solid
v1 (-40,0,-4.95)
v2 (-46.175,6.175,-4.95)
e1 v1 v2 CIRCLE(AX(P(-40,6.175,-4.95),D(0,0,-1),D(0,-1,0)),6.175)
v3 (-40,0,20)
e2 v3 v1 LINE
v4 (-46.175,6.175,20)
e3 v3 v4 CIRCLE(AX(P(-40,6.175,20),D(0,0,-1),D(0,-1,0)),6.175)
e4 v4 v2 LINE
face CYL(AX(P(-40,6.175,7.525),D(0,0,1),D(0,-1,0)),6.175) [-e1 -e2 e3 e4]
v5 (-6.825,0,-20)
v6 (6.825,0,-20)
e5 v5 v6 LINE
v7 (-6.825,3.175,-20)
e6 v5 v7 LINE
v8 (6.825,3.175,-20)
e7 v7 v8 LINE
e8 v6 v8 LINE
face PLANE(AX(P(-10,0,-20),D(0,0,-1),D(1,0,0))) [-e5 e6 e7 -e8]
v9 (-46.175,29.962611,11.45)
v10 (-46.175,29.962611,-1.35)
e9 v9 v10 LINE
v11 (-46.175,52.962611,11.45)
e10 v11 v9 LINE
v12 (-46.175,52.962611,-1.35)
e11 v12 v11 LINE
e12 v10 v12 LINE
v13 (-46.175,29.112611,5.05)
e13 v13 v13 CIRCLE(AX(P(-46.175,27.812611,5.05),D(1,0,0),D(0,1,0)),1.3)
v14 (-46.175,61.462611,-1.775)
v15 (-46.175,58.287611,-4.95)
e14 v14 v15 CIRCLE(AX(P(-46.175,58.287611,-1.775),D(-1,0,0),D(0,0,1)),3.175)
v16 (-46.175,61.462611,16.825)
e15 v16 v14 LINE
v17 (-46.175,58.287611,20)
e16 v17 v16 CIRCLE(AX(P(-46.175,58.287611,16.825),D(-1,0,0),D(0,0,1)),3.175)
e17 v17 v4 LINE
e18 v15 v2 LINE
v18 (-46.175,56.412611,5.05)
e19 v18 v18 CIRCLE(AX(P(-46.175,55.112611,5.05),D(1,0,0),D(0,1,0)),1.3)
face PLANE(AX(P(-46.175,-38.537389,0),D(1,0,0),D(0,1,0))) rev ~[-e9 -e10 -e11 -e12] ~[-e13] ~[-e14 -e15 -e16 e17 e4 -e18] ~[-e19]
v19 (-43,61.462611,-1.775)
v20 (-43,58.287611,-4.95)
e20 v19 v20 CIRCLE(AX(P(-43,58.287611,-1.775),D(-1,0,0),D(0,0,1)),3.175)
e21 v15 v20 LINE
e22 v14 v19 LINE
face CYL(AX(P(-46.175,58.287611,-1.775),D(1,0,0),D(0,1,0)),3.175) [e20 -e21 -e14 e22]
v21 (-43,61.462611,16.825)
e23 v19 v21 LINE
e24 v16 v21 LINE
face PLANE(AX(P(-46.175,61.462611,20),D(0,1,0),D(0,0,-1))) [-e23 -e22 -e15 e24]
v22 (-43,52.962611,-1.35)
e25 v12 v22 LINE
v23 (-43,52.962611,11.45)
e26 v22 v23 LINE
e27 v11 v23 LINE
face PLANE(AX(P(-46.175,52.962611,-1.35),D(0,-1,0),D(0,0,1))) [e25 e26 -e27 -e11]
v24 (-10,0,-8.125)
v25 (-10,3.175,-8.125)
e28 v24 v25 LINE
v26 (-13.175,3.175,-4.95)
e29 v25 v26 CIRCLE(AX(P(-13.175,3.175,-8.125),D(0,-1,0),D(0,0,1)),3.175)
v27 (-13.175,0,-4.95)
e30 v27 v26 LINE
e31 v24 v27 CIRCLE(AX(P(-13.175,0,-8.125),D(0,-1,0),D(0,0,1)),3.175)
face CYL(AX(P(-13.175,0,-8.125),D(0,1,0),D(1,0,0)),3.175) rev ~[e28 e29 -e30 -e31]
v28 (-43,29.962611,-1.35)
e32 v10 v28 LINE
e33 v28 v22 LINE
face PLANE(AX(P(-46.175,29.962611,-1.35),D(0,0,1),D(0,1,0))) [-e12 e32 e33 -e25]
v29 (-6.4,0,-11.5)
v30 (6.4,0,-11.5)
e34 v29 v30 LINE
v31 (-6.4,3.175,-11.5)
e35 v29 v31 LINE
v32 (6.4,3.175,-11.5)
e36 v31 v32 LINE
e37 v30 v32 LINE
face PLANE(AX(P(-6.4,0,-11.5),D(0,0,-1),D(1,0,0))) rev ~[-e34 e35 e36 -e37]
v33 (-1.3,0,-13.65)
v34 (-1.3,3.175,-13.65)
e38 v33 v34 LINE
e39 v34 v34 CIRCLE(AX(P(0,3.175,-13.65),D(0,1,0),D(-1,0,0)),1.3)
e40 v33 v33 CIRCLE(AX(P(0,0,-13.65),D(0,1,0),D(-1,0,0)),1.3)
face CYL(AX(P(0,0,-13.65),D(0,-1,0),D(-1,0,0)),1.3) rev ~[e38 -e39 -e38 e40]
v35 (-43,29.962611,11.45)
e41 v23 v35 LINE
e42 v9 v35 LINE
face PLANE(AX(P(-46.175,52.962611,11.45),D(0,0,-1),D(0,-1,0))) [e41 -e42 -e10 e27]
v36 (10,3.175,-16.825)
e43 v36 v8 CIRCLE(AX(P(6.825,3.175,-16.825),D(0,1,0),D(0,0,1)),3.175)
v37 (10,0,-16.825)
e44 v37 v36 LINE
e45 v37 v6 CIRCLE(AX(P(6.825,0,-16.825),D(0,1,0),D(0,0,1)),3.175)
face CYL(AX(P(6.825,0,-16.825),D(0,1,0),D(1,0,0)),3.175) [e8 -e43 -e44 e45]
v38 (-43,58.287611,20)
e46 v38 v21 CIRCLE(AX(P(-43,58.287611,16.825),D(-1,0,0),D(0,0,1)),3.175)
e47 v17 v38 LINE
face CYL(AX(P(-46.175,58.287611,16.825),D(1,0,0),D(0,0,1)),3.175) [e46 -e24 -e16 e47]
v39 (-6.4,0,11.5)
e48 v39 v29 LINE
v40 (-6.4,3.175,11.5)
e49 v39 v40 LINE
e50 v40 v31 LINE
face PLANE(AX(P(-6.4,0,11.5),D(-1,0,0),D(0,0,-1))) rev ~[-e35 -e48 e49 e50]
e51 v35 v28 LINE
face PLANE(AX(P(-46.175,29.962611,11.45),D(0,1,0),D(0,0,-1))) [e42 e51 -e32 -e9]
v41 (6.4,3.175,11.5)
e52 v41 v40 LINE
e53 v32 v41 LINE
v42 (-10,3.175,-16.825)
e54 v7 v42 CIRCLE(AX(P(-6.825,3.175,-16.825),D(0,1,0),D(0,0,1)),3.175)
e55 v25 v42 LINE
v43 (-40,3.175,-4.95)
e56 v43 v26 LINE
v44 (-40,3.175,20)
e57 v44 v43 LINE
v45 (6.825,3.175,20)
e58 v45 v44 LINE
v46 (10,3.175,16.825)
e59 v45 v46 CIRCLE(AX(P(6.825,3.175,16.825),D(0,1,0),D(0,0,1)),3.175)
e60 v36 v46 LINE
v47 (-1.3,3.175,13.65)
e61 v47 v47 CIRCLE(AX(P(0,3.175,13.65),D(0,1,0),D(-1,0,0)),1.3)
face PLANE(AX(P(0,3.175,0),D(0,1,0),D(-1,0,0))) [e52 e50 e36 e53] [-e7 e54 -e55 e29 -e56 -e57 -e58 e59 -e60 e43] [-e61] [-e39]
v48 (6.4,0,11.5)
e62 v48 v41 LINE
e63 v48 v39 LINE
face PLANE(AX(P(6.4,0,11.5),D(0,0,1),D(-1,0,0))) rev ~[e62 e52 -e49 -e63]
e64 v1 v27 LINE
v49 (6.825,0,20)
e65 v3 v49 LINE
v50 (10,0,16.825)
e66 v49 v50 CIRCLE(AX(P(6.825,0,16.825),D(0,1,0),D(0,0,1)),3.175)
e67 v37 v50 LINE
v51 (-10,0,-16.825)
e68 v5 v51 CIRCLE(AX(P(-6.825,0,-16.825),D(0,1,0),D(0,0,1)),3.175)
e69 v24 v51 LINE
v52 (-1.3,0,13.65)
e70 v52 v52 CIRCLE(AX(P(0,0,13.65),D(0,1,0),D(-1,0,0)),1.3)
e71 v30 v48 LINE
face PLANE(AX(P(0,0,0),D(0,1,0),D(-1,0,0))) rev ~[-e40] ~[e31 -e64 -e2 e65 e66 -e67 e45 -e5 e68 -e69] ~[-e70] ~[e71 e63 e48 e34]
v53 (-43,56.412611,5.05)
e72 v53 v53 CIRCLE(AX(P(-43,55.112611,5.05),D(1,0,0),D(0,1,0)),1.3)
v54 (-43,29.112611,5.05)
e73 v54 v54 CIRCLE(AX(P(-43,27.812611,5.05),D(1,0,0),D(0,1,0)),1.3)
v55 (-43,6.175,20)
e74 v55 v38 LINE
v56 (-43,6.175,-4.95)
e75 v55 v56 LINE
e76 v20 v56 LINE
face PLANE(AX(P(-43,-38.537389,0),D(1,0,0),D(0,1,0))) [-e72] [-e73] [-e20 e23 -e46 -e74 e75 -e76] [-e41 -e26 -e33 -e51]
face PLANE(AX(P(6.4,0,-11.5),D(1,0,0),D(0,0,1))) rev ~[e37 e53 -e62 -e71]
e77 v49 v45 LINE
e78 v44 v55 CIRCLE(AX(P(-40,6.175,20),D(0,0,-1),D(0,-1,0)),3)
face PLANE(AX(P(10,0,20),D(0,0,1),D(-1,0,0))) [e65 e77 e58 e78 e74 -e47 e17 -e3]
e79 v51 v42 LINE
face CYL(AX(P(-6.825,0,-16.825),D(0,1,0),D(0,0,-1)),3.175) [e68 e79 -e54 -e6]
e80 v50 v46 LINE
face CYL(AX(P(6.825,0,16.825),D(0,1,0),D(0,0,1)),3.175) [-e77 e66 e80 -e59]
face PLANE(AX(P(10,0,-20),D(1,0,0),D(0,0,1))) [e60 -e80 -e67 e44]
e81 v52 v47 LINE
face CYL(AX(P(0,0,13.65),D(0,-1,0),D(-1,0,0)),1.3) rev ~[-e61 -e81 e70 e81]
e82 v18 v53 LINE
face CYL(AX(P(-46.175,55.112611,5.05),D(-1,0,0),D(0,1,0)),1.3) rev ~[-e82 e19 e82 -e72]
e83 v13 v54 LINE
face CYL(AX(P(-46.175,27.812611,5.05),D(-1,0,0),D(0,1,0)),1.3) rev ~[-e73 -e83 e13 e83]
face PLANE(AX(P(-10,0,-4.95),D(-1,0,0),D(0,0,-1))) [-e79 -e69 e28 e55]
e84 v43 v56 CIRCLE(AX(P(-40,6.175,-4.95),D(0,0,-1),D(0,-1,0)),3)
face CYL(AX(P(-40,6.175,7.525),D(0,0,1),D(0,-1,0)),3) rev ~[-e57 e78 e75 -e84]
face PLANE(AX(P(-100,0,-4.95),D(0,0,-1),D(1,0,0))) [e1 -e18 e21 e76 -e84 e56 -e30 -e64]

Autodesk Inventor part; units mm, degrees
ref_plane "YZ Plane" through (0, 0, 0) normal (1, 0, 0) x (0, 1, 0)
ref_plane "XZ Plane" through (0, 0, 0) normal (0, 1, 0) x (-1, 0, 0)
ref_plane "XY Plane" through (0, 0, 0) normal (0, 0, 1) x (1, 0, 0)
sketch "Sketch2" plane through (0, 0, 0) normal (0, 1, 0) x (-1, 0, 0)
  line L0 (-6.4, 11.5) -> (6.4, 11.5)
  line L1 (6.4, 11.5) -> (6.4, -11.5)
  line L2 (6.4, -11.5) -> (-6.4, -11.5)
  line L3 (-6.4, -11.5) -> (-6.4, 11.5)
  line L4 (-6.4, 11.5) -> (6.4, -11.5) construction
  line L5 (6.4, 11.5) -> (-6.4, -11.5) construction
  circle A0 centre (0, 0) radius 13.65 construction
  line L6 (0, 0) -> (0, -13.65) construction
  circle A1 centre (0, -13.65) radius 1.3
  circle A2 centre (0, 13.65) radius 1.3
  line L7 (-10, 20) -> (10, 20)
  line L8 (10, 20) -> (10, -20)
  line L9 (10, -20) -> (-10, -20)
  line L10 (-10, -20) -> (-10, 20)
  line L11 (-10, 20) -> (10, -20) construction
  line L12 (10, 20) -> (-10, -20) construction
  line L13 (-10, 5.05) -> (10, 5.05) construction
  line L14 (10, 15.05) -> (100, 15.05)
  line L15 (100, 15.05) -> (100, -4.95)
  line L16 (100, -4.95) -> (10, -4.95)
  line L17 (10, -4.95) -> (10, 15.05)
  line L18 (100, 5.05) -> (10, 5.05) construction
  line L19 (91.5, 11.45) -> (68.5, 11.45)
  line L20 (68.5, 11.45) -> (68.5, -1.35)
  line L21 (68.5, -1.35) -> (91.5, -1.35)
  line L22 (91.5, -1.35) -> (91.5, 11.45)
  line L23 (91.5, 11.45) -> (68.5, -1.35) construction
  line L24 (68.5, 11.45) -> (91.5, -1.35) construction
  circle A3 centre (80, 5.05) radius 13.65 construction
  circle A4 centre (93.65, 5.05) radius 1.3
  circle A5 centre (66.35, 5.05) radius 1.3
  line L25 (100, 15.05) -> (10, 15.05)
  line L26 (10, 15.05) -> (10, 20)
  line L27 (10, 20) -> (100, 20)
  line L28 (100, 20) -> (100, 15.05)
  dimension "d2" = 27.3
  dimension "d20" = 27.3
  dimension "d0" = 12.8
  dimension "d1" = 23
  dimension "d3" = 2.6
  dimension "d6" = 360
  dimension "d8" = 20
  dimension "d9" = 40
  dimension "d11" = 8.6
  dimension "d12" = 90
  dimension "d14" = 20
  dimension "d18" = 12.8
  dimension "d19" = 23
  dimension "d21" = 2.6
  dimension "d24" = 360
  dimension "d26" = 20
extrude "Extrusion1" add sketch "Sketch2" along normal blind 3.175
fillet "Fillet1" radius 3.175 6 edges at (10, 1.5875, 20) (10, 1.5875, -20) (-10, 1.5875, -20) (-10, 1.5875, -4.95) (-100, 1.5875, -4.95) (-100, 1.5875, 20)
sketch "Sketch3" plane through (0, 3.175, 0) normal (0, 1, 0) x (1, 0, 0)
  line L0 (-96.825, -15.05) -> (-13.175, -15.05) projected
  line L1 (-40, -15.05) -> (-40, 4.95)
  line L2 (-13.175, 4.95) -> (-96.825, 4.95) projected
  line L3 (10, -16.825) -> (10, 16.825) projected
  point P0 (0, 0)
  dimension "d27" = 50
bend part "Bend Part1" radius 3 angle 90 line through (-40, 3.175, 15.05) along (0, 0, -1) centre toward (0, 1, 0) moving side (-1, 0, 0) both sides no
equation "\"d20\" = d2"
equation "\"d18\" = d0"
equation "\"d19\" = d1"
equation "\"d21\" = d3"
properties part number "Midplate"
